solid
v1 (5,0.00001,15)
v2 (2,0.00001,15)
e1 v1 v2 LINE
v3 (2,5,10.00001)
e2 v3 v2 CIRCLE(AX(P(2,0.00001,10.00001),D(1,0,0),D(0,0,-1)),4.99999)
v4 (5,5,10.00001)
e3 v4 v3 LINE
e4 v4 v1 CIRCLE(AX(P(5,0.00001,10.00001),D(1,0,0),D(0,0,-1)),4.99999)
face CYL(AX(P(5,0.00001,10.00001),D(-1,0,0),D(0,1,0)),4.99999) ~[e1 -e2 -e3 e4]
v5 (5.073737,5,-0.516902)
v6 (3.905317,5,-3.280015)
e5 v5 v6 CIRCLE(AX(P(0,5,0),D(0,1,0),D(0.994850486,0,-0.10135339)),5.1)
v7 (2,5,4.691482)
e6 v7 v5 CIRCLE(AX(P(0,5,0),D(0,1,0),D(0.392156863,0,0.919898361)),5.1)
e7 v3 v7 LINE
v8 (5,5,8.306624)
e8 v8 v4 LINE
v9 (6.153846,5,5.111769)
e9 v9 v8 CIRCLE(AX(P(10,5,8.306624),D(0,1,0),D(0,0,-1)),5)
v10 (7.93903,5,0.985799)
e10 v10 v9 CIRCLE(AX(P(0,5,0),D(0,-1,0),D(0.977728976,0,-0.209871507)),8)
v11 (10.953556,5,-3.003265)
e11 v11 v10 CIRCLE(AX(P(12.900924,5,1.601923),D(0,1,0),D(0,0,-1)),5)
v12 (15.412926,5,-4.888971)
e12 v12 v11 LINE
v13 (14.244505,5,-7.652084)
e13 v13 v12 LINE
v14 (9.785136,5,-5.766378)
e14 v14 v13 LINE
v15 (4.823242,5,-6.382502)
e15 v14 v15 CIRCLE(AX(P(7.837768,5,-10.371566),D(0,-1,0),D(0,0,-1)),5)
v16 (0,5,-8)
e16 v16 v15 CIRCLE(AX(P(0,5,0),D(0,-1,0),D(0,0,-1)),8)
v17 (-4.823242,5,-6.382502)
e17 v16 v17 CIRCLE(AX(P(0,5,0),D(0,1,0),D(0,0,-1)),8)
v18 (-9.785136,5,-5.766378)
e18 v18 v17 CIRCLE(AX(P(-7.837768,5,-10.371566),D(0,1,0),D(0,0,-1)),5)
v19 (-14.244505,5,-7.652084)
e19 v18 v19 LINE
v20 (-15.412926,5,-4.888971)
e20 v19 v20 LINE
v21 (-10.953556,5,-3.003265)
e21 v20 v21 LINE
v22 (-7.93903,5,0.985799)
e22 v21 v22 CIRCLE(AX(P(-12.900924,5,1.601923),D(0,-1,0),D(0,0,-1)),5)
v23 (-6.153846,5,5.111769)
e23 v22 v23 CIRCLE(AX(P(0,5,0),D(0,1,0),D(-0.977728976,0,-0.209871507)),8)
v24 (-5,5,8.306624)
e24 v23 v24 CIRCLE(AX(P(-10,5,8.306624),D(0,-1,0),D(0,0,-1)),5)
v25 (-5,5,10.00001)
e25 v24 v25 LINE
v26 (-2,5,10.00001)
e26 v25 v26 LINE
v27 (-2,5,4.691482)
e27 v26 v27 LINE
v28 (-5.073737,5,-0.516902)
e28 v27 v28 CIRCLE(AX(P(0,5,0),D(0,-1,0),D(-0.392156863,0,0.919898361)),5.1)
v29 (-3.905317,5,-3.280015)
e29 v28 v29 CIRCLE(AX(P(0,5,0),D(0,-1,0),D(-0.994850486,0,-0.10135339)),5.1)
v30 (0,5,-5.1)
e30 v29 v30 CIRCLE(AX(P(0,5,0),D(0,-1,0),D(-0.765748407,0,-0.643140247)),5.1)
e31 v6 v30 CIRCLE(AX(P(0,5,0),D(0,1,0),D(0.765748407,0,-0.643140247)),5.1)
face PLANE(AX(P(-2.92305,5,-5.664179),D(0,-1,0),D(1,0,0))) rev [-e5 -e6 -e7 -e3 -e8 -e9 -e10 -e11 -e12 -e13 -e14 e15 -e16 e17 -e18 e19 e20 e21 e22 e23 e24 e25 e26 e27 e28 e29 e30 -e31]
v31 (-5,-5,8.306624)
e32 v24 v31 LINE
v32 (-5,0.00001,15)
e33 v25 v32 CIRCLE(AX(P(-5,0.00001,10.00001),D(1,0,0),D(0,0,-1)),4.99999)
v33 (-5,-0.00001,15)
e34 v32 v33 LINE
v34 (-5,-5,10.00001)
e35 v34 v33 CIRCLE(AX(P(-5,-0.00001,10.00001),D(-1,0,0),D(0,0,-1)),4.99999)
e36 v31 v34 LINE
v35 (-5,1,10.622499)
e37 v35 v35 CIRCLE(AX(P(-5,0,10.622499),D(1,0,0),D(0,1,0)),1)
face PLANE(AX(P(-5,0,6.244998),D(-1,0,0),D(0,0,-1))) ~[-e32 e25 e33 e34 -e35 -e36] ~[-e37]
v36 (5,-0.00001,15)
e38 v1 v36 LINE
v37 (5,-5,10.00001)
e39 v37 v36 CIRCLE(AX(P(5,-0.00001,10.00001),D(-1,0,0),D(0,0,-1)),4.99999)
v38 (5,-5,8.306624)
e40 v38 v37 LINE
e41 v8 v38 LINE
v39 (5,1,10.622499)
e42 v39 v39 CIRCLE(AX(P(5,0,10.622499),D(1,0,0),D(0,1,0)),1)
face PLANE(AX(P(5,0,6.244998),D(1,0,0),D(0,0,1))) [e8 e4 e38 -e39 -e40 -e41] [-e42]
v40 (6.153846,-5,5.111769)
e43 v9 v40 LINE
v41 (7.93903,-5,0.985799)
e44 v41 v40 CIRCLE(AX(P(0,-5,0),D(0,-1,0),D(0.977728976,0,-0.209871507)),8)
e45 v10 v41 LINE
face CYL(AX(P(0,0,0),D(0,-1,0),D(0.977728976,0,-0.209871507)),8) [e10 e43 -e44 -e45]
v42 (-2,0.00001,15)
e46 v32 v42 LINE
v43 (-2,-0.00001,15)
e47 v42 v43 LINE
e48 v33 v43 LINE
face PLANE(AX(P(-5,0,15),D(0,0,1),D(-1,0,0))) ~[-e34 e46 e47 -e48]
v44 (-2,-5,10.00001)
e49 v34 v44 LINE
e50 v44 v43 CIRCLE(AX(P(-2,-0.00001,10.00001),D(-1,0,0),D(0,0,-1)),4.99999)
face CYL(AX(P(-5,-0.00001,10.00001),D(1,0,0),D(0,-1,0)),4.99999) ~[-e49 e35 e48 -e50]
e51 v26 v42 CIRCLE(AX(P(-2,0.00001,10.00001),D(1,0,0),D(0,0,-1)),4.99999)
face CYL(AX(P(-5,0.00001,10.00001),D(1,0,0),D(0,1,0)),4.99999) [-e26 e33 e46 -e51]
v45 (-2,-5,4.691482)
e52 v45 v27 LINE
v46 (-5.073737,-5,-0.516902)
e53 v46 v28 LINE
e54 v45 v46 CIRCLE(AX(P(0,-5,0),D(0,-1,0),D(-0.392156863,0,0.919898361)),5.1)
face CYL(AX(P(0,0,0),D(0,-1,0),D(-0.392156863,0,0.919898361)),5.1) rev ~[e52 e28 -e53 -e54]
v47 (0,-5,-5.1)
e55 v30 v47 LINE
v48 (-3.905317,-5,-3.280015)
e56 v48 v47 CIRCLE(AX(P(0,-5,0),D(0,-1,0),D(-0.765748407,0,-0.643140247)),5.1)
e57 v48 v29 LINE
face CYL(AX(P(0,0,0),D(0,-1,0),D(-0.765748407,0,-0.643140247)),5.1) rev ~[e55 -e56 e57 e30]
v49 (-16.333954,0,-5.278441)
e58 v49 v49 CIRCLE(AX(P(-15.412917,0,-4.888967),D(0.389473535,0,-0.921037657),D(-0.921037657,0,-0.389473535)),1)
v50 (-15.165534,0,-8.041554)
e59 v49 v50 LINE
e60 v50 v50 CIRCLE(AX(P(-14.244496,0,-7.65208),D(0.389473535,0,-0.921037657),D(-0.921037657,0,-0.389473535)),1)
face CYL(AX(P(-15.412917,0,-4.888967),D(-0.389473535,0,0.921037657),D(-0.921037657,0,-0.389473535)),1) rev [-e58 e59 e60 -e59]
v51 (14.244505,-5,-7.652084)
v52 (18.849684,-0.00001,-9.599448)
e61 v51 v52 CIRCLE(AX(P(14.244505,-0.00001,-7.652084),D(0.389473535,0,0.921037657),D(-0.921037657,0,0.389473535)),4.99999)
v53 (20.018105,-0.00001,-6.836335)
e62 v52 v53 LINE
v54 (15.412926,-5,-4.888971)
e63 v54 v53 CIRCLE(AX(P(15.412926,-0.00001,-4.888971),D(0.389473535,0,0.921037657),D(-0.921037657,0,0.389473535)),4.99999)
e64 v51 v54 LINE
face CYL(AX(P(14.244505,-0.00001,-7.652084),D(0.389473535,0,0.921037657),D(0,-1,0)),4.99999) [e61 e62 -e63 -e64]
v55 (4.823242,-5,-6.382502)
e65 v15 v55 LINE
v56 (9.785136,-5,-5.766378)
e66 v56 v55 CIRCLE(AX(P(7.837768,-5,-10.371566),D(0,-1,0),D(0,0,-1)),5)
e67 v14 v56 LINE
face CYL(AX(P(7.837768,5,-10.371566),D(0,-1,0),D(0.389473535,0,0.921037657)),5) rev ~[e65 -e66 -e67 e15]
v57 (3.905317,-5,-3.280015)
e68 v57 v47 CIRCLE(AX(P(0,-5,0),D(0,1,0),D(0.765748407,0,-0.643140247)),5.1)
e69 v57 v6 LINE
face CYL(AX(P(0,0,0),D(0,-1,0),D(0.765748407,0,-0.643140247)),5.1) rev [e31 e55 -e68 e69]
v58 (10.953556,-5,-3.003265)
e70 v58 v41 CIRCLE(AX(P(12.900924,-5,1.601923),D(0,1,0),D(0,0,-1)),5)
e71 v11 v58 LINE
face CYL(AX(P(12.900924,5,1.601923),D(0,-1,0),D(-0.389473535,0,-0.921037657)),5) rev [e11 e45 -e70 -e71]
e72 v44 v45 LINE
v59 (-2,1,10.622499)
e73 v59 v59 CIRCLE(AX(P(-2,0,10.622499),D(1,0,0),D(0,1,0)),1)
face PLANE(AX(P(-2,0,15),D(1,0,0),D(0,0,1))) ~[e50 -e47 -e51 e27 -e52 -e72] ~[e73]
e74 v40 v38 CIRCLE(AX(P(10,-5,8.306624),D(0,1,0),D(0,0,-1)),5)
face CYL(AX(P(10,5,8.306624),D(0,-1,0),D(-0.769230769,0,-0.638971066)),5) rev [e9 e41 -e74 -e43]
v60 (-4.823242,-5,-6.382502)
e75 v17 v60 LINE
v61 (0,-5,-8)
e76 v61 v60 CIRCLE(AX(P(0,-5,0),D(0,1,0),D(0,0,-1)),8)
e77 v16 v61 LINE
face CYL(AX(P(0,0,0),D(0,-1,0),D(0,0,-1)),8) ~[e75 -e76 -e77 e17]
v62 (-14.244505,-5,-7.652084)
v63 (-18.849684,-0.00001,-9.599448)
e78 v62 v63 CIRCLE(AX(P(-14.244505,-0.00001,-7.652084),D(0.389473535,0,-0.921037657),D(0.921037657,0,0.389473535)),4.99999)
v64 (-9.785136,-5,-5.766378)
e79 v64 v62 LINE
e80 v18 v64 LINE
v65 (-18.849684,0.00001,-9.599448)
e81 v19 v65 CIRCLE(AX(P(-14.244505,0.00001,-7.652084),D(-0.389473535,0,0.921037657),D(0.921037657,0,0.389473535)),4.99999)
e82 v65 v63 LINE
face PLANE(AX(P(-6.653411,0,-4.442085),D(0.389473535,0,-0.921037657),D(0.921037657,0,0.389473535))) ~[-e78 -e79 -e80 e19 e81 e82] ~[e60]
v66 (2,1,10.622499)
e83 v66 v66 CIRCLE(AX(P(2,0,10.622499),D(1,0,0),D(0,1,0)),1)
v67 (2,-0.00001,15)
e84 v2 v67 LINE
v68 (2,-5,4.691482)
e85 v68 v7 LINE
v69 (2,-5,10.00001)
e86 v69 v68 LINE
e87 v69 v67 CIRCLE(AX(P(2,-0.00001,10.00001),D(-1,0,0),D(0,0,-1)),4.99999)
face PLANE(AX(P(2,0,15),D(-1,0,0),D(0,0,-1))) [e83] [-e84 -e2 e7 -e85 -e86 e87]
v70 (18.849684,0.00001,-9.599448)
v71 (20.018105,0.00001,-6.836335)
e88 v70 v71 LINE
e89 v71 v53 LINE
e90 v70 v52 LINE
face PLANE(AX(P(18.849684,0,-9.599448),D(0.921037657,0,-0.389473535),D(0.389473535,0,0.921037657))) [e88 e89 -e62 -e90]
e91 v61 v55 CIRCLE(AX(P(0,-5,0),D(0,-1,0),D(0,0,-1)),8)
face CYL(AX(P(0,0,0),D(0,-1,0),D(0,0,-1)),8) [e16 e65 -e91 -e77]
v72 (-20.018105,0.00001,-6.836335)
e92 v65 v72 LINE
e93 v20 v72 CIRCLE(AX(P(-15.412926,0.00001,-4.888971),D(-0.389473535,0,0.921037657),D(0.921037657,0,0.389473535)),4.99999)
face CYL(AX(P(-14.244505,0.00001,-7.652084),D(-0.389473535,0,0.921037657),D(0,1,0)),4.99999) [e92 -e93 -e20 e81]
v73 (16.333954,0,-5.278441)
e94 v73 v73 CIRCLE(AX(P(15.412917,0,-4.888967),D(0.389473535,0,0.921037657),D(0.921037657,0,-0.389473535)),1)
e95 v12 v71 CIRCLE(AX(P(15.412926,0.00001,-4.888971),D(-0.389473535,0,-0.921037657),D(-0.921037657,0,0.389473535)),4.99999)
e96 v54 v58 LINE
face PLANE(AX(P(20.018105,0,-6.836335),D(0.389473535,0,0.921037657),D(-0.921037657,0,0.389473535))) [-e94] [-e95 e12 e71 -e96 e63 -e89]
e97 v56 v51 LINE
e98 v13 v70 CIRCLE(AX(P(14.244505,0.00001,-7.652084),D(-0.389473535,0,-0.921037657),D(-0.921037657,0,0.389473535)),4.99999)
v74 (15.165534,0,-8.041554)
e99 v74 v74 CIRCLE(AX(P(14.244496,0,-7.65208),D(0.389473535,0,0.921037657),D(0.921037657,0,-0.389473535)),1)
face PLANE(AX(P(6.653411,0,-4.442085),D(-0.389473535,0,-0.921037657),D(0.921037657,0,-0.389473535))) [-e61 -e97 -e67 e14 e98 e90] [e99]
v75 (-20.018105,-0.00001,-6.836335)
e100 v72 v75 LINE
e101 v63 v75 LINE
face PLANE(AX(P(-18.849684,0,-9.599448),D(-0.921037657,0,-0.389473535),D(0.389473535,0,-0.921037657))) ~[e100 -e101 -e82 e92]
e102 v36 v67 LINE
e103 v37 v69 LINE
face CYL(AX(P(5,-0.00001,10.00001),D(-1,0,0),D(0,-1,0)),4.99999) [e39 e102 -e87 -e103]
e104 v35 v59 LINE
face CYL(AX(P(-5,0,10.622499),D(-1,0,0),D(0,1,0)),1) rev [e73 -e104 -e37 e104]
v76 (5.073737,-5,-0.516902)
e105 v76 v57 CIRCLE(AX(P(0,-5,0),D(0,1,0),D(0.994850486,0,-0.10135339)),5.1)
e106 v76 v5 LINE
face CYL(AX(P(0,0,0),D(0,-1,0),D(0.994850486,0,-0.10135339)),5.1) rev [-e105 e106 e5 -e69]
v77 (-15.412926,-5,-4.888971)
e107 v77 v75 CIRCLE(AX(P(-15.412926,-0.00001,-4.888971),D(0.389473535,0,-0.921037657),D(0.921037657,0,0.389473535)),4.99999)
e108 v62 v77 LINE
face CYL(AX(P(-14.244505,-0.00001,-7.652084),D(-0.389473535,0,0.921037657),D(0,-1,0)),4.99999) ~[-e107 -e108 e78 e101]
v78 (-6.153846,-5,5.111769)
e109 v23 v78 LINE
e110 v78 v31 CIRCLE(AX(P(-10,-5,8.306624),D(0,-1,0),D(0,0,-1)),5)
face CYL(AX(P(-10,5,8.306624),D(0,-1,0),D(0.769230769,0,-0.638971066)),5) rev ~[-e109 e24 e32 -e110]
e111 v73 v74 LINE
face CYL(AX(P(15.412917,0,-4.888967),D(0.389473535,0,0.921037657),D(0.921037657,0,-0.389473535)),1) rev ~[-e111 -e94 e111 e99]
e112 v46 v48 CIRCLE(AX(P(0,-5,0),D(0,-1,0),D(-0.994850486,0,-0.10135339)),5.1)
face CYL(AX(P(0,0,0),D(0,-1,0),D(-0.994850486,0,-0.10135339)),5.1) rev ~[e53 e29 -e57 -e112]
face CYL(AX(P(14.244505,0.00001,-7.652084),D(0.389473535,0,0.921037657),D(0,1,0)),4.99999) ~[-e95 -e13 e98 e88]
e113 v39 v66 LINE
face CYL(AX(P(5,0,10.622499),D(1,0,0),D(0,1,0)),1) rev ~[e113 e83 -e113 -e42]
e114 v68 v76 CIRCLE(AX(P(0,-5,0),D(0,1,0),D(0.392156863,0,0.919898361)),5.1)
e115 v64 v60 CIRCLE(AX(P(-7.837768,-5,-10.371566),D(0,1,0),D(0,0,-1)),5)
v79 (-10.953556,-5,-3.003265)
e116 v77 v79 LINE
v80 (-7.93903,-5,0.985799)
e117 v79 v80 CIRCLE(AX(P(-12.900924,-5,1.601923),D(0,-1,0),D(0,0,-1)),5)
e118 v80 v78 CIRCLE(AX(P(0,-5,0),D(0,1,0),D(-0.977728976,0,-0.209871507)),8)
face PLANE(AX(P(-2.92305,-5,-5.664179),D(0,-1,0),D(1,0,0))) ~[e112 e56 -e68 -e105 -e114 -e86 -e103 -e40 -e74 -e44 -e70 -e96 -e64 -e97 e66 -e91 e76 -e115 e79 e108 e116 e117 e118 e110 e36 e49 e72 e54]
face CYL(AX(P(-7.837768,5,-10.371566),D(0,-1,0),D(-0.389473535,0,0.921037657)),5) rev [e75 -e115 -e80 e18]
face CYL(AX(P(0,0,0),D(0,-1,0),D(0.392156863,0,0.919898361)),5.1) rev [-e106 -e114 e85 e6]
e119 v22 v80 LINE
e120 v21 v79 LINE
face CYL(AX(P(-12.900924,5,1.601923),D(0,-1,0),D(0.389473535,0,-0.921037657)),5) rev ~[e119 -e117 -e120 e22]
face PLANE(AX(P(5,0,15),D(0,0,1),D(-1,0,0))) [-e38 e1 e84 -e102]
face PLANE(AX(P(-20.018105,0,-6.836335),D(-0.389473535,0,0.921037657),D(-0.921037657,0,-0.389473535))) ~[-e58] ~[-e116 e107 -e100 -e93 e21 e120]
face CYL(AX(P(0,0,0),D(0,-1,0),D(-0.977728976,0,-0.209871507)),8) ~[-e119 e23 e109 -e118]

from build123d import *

# Parameters (mm, degrees)
F1_DEPTH = 5
F2_R     = 1
F3_DEPTH = 25
F4_R     = 1
F5_DEPTH = 25
F6_R     = 4.99999
F7_R     = 5


# Not quite as in the source:
# - a fillet or chamfer is up to 0.001 mm smaller than in the source, because OpenCascade refuses the exact size
# - a feature names something its author has since deleted; it is built from what else it names


with BuildPart() as f1:
    # F0 (on Front) → F1 (new body, symmetric)
    with BuildSketch(Plane.XZ):
        with BuildLine():
            ThreePointArc((3.9053168747, -3.2800152603), (2.1542889978, -4.62266578), (0, -5.1))
            Line((0, -5.1), (0, -8))
            ThreePointArc((0, -8), (3.7724872299, -7.0546679653), (6.6534112025, -4.4420850251))
            Line((6.6534112025, -4.4420850251), (3.9053168747, -3.2800152603))
        make_face()
        with BuildLine():
            ThreePointArc((5.0737374807, -0.5169022898), (4.6972920498, -1.9863150301), (3.9053168747, -3.2800152603))
            Line((3.9053168747, -3.2800152603), (6.6534112025, -4.4420850251))
            ThreePointArc((6.6534112025, -4.4420850251), (7.3683012546, -3.1157882825), (7.8218318085, -1.6789720546))
            Line((7.8218318085, -1.6789720546), (5.0737374807, -0.5169022898))
        make_face()
        with BuildLine():
            ThreePointArc((2, 4.6914816423), (4.392181267, 2.5920539573), (5.0737374807, -0.5169022898))
            Line((5.0737374807, -0.5169022898), (7.8218318085, -1.6789720546))
            ThreePointArc((7.8218318085, -1.6789720546), (7.5363895919, 2.683809218), (5, 6.2449979984))
            ThreePointArc((5, 6.2449979984), (3.5795567819, 7.1544932207), (2, 7.7459666924))
            Line((2, 7.7459666924), (2, 4.6914816423))
        make_face()
        with BuildLine():
            ThreePointArc((7.8218318085, -1.6789720546), (7.3683012546, -3.1157882825), (6.6534112025, -4.4420850251))
            Line((6.6534112025, -4.4420850251), (18.8496842561, -9.5994480802))
            Line((18.8496842561, -9.5994480802), (20.018104862, -6.8363351098))
            Line((20.018104862, -6.8363351098), (7.8218318085, -1.6789720546))
        make_face()
        with BuildLine():
            Line((2, 15), (2, 7.7459666924))
            ThreePointArc((2, 7.7459666924), (3.5795567819, 7.1544932207), (5, 6.2449979984))
            Line((5, 6.2449979984), (5, 15))
            Line((5, 15), (2, 15))
        make_face()
    extrude(amount=F1_DEPTH, both=True)

    # F2 (on face) → F3 (cut)
    with BuildSketch(Plane(origin=(0.584210303, 0, 1.3815564852), x_dir=(0.9210376568, 0, -0.3894735353), z_dir=(0.3894735353, 0, 0.9210376568))):
        with Locations((16.1, 0)):
            Circle(F2_R)
    extrude(amount=-F3_DEPTH, mode=Mode.SUBTRACT)

    # F4 (on face) → F5 (cut)
    with BuildSketch(Plane.YZ.offset(5)):
        with Locations((0, 10.6224989992)):
            Circle(F4_R)
    extrude(amount=-F5_DEPTH, mode=Mode.SUBTRACT)

    # F6 (radius 5 in the source; OpenCascade refuses exactly that, so slightly less here)
    f6_edges = [f1.edges().sort_by_distance(p)[0] for p in [
        (19.433895, 5, -8.217892),
        (19.433895, -5, -8.217892),
        (3.5, -5, 15),
        (3.5, 5, 15),
    ]]
    fillet(f6_edges, radius=F6_R)

    # F7
    f7_edges = [f1.edges().sort_by_distance(p)[0] for p in [
        (5, 0, 6.244998),
        (7.821832, 0, -1.678972),
        (6.653411, 0, -4.442085),
    ]]
    fillet(f7_edges, radius=F7_R)

    # F8: F1 across plane


with BuildPart() as f1_1:
    add(f1.part)
    add(f1.part.mirror(Plane.YZ))


solid = f1_1.part
